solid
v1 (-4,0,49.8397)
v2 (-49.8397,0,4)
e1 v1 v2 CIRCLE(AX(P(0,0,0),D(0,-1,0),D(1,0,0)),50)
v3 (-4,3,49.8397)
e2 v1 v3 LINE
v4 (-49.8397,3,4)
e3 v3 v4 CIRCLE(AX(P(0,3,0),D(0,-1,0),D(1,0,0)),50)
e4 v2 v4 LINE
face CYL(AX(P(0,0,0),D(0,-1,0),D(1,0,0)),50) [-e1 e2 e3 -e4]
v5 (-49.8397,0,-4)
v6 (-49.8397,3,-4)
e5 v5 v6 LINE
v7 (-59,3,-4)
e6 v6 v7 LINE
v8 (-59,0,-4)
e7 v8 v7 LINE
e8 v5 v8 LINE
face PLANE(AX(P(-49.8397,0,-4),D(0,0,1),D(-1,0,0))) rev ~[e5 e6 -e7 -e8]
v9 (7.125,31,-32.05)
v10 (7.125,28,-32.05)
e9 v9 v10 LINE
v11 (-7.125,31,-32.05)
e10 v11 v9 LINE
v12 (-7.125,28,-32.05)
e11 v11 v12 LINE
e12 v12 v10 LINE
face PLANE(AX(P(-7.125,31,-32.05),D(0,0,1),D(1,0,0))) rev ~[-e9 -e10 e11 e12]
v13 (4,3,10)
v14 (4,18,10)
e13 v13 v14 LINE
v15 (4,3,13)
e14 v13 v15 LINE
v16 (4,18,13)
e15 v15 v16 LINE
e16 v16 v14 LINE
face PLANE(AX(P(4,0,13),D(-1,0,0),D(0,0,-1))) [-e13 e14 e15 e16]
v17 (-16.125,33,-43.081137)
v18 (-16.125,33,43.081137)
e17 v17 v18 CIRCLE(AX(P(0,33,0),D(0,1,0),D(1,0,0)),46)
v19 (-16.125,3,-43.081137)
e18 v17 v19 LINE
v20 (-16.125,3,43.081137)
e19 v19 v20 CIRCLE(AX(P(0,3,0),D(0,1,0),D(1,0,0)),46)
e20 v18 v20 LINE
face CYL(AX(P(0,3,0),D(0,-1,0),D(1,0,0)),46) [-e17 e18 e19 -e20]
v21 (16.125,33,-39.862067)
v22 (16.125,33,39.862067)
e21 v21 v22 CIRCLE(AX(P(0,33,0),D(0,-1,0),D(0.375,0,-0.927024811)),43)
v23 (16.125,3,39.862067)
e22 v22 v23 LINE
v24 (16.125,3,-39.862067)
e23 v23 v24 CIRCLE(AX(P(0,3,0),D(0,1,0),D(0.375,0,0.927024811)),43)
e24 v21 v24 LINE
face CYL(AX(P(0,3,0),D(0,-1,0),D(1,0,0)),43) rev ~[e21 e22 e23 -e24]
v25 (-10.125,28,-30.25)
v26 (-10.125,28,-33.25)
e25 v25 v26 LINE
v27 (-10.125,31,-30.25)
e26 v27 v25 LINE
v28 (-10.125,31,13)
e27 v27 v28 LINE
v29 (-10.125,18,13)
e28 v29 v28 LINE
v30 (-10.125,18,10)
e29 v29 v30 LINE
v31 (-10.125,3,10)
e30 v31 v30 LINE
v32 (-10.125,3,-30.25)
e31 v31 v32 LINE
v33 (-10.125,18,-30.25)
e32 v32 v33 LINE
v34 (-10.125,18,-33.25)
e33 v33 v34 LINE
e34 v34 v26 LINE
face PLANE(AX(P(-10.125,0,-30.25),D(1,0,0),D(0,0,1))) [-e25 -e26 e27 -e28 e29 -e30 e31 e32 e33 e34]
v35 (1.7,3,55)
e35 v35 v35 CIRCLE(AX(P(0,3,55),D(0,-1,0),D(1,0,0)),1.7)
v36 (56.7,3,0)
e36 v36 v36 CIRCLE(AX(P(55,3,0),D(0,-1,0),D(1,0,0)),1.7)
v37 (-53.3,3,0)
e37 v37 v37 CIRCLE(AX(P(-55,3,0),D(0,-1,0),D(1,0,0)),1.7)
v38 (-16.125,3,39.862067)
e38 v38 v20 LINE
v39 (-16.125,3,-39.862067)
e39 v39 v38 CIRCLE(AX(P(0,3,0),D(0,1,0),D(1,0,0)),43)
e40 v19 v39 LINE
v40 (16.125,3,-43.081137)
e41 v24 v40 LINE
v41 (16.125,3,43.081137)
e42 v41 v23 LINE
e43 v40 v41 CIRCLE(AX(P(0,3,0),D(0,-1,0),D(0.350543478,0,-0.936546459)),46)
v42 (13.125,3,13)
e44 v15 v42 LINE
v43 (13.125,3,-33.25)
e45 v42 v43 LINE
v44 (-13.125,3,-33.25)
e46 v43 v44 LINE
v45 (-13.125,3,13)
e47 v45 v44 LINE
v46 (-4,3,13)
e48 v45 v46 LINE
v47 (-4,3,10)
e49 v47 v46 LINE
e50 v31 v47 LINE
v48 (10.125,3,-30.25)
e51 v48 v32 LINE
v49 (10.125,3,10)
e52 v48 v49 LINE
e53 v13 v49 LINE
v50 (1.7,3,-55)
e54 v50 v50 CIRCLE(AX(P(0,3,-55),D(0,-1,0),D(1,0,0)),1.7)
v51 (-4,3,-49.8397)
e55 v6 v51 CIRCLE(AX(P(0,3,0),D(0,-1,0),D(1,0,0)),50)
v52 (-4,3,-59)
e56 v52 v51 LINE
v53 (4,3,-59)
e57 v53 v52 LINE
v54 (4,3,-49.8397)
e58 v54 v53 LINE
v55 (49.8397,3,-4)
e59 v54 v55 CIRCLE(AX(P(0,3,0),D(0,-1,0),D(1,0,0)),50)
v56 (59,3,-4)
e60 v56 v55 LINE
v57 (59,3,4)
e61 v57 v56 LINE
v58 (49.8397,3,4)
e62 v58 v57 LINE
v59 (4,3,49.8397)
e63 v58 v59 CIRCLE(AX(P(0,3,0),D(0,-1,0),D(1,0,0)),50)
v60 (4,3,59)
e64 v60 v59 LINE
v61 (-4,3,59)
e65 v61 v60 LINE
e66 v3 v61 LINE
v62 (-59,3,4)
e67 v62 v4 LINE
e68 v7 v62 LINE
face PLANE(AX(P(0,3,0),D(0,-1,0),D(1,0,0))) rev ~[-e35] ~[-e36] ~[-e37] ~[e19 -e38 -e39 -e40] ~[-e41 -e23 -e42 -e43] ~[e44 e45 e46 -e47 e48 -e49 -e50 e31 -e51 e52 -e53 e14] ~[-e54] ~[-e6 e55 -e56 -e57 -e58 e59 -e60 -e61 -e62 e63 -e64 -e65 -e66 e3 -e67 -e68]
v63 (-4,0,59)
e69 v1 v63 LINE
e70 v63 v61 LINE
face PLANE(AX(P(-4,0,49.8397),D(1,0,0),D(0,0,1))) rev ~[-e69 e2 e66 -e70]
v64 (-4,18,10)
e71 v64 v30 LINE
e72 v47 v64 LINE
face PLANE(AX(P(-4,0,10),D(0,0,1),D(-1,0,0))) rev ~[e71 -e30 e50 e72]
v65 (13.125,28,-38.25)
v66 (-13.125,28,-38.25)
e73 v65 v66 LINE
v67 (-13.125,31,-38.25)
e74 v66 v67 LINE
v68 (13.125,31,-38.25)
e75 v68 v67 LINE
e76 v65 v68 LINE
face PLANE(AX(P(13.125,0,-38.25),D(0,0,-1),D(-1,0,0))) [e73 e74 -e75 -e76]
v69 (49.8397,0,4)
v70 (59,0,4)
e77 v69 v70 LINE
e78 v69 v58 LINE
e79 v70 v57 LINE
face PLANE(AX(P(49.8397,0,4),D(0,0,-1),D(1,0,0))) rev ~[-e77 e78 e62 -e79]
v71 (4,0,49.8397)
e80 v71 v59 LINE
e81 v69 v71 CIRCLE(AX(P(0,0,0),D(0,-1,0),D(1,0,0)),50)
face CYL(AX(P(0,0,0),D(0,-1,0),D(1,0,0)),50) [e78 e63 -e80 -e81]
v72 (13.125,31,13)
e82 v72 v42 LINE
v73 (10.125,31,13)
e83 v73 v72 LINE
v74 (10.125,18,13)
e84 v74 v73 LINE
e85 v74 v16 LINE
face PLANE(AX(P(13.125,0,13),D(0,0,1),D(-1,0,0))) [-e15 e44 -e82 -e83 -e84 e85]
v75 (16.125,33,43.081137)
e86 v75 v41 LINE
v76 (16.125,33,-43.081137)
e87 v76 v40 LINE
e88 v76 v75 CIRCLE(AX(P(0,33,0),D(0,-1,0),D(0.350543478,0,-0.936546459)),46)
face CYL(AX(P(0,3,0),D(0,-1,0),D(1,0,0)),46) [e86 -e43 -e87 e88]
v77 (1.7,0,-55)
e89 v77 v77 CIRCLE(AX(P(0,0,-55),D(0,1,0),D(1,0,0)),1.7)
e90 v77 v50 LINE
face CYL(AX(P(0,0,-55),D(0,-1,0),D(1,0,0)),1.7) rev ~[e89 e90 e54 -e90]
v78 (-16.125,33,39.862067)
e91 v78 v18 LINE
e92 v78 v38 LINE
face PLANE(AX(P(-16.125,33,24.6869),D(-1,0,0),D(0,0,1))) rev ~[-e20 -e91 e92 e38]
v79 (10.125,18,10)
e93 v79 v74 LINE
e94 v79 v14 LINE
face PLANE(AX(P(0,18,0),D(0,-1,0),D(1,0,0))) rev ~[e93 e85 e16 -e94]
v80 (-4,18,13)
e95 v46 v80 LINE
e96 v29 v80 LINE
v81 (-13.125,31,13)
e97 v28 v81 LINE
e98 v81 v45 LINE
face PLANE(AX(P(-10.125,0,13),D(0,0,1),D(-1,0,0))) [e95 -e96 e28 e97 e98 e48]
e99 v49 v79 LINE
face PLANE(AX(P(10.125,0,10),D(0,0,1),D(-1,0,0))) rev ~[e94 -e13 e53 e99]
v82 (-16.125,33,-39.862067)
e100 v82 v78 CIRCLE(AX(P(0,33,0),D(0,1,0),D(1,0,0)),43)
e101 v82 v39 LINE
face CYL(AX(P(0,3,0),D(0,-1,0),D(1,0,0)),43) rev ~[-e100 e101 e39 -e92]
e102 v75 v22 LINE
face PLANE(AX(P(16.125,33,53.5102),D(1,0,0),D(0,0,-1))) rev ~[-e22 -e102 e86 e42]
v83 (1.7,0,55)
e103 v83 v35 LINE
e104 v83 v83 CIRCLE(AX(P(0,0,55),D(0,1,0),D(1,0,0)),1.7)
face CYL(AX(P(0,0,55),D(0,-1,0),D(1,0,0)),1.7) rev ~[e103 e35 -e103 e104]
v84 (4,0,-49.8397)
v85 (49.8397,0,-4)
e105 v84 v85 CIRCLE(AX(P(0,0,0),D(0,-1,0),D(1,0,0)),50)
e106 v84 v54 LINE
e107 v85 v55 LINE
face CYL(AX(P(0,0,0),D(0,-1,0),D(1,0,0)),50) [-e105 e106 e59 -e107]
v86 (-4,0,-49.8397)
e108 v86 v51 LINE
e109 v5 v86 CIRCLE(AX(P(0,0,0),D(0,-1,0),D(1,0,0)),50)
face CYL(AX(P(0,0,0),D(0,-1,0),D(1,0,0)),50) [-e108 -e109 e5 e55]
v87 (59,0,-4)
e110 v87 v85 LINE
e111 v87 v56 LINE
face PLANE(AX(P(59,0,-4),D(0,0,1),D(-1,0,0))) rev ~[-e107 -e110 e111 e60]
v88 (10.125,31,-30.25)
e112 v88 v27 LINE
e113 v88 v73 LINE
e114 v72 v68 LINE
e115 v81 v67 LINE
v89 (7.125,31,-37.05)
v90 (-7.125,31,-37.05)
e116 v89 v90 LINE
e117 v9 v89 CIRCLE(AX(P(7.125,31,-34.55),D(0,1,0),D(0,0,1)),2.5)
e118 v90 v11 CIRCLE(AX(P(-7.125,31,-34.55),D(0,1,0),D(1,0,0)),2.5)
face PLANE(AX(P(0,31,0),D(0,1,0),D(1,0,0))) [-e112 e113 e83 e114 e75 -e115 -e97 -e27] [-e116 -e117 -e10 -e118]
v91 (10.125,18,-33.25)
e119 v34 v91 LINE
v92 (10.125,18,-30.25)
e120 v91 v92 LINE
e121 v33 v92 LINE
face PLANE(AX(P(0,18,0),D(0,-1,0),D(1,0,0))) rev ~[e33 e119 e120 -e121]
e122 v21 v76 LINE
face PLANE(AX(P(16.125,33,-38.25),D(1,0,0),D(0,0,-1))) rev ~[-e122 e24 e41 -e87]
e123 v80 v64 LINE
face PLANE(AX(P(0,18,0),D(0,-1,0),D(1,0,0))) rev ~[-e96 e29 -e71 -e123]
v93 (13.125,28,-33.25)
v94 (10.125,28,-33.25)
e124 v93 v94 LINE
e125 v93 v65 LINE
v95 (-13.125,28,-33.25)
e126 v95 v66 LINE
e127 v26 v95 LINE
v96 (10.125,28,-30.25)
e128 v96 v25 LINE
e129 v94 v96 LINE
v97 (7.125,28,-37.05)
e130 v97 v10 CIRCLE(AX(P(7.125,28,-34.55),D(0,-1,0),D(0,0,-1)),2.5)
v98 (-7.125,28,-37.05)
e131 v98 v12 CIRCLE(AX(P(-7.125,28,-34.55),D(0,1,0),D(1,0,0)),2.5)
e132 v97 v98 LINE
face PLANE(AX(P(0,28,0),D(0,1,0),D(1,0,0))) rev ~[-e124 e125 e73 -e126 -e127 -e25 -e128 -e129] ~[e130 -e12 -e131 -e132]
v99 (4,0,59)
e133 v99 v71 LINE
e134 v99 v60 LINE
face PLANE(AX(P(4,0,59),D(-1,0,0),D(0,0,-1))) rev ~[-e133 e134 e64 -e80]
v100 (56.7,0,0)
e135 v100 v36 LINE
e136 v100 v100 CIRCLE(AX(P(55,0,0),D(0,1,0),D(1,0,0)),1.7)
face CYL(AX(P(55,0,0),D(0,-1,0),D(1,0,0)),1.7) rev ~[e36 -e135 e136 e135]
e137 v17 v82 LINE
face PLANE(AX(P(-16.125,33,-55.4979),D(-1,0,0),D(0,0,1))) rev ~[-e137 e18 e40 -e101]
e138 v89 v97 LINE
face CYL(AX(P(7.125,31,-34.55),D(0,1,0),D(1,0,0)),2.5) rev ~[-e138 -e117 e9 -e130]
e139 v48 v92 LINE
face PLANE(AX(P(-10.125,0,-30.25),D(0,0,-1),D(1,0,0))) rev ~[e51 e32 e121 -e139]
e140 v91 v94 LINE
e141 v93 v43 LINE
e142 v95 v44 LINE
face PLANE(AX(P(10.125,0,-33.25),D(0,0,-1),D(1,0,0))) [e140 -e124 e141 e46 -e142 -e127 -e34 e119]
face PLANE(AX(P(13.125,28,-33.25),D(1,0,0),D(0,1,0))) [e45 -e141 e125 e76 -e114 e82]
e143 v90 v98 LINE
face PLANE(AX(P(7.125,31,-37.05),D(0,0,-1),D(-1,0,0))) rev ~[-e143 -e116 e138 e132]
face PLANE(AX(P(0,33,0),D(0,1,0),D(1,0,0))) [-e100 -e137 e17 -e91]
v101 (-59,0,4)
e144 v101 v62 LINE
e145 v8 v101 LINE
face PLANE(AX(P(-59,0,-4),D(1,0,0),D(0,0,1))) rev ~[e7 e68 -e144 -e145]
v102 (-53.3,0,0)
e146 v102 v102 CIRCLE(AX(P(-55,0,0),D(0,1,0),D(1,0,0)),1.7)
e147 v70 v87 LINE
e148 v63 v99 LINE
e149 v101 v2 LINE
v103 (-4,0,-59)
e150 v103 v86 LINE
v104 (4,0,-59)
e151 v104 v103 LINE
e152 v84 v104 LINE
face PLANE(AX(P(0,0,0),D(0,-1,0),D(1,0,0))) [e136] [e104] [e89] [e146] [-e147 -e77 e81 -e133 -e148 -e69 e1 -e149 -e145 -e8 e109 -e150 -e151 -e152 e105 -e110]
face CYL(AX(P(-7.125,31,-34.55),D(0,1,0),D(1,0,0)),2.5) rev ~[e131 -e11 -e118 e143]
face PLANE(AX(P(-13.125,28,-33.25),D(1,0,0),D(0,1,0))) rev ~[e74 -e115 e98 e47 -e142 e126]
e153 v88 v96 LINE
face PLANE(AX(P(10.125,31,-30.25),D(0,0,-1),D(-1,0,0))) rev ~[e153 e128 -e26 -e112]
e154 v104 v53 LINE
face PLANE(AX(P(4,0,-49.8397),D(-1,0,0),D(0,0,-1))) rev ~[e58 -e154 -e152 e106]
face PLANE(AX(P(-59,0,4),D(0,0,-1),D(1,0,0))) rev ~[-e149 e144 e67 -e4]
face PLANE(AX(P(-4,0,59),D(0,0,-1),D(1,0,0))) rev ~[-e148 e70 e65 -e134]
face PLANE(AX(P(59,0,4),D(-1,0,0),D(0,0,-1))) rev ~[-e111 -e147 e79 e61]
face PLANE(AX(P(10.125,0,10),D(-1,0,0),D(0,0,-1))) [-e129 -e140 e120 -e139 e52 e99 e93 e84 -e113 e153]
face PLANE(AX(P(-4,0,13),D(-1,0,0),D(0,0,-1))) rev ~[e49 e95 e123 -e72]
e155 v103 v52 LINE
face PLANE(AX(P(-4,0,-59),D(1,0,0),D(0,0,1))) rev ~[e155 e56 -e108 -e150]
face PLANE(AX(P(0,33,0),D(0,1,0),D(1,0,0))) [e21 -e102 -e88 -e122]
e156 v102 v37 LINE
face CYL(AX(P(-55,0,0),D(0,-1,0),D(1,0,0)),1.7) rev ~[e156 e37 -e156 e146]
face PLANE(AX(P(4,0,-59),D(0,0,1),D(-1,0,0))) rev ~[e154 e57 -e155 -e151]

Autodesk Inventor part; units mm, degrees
ref_plane "YZ Plane" through (0, 0, 0) normal (1, 0, 0) x (0, 1, 0)
ref_plane "XZ Plane" through (0, 0, 0) normal (0, 1, 0) x (-1, 0, 0)
ref_plane "XY Plane" through (0, 0, 0) normal (0, 0, 1) x (1, 0, 0)
sketch "Sketch1" plane through (0, 0, 0) normal (0, 1, 0) x (-1, 0, 0)
  circle A0 centre (0, 0) radius 70.5
  circle A1 centre (0, 0) radius 75.5
  dimension "d0" = 141
  dimension "d4" = 5
extrude "Extrusion1" add sketch "Sketch1" along normal blind 50
sketch "Sketch2" plane through (0, 0, 0) normal (0, -1, 0) x (1, 0, 0)
  line L0 (-10.125, 10) -> (10.125, 10)
  line L1 (10.125, 10) -> (10.125, -30.25)
  line L2 (10.125, -30.25) -> (-10.125, -30.25)
  line L3 (-10.125, -30.25) -> (-10.125, 10)
  point P0 (0, 0)
  point P1 (0, 10)
  dimension "d5" = 20.25
  dimension "d6" = 40.25
  dimension "d7" = 10
  dimension "d8" = 10.125
  dimension "d9" = 10.125
extrude "Extrusion2" add sketch "Sketch2" against normal blind 3
sketch "Sketch3" plane through (0, 0, 0) normal (0, -1, 0) x (1, 0, 0)
  line L0 (13.125, 13) -> (10.125, 13)
  line L1 (10.125, 13) -> (10.125, -33.25)
  line L2 (10.125, -33.25) -> (13.125, -33.25)
  line L3 (13.125, -33.25) -> (13.125, 13)
  line L4 (10.125, -33.25) -> (-13.125, -33.25)
  line L5 (-13.125, -33.25) -> (-13.125, -30.25)
  line L6 (-13.125, -30.25) -> (10.125, -30.25)
  line L7 (10.125, -30.25) -> (10.125, -33.25)
  line L8 (-13.125, -30.25) -> (-10.125, -30.25)
  line L9 (-10.125, -30.25) -> (-10.125, 13)
  line L10 (-10.125, 13) -> (-13.125, 13)
  line L11 (-13.125, 13) -> (-13.125, -30.25)
  line L12 (-10.125, -30.25) -> (10.125, -30.25) projected
  line L13 (10.125, -30.25) -> (10.125, 10) projected
  line L14 (-10.125, 10) -> (-10.125, -30.25) projected
  line L15 (10.125, 10) -> (-10.125, 10) projected
  line L16 (10.125, 13) -> (4, 13)
  line L17 (4, 13) -> (4, 10)
  line L18 (4, 10) -> (10.125, 10)
  line L19 (10.125, 10) -> (10.125, 13)
  line L20 (-10.125, 13) -> (-4, 13)
  line L21 (-4, 13) -> (-4, 10)
  line L22 (-4, 10) -> (-10.125, 10)
  line L23 (-10.125, 10) -> (-10.125, 13)
  point P0 (0, 0)
  point P1 (-11.625, 13)
  point P2 (10.125, 11.5)
  dimension "d12" = 3
  dimension "d13" = 3
  dimension "d14" = 3
  dimension "d15" = 0
  dimension "d16" = 0
  dimension "d17" = 0
  dimension "d18" = 3
  dimension "d19" = 3
  dimension "d20" = 6.125
  dimension "d21" = 6.125
extrude "Extrusion3" add sketch "Sketch3" against normal blind 18 contours L3 L2 L1 L0 | L1 L15 L17 L16 | L4 L5 L6 L1 | L6 L11 L10 L9 | L15 L9 L20 L21
sketch "Sketch4" plane through (0, 18, 0) normal (0, 1, 0) x (1, 0, 0)
  line L0 (-4, -13) -> (-13.125, -13) projected
  line L1 (-13.125, 33.25) -> (13.125, 33.25) projected
  line L2 (-13.125, -13) -> (-10.125, -13)
  line L3 (-10.125, -13) -> (-10.125, 33.25)
  line L4 (-10.125, 33.25) -> (-13.125, 33.25)
  line L5 (-13.125, 33.25) -> (-13.125, -13)
  line L6 (13.125, -13) -> (13.125, 33.25) projected
  line L7 (13.125, 33.25) -> (10.125, 33.25)
  line L8 (10.125, 33.25) -> (10.125, -13)
  line L9 (10.125, -13) -> (13.125, -13)
  line L10 (13.125, -13) -> (13.125, 33.25)
  line L11 (-10.125, -10) -> (-10.125, 30.25) projected
  point P0 (0, 0)
  dimension "d24" = 0
extrude "Extrusion4" add sketch "Sketch4" along normal blind 13
sketch "Sketch5" plane through (13.125, 0, -33.25) normal (0, 0, -1) x (-1, 0, 0)
  line L0 (23.25, 31) -> (26.25, 31) projected
  line L1 (0, 0) -> (0, 31) projected
  line L2 (26.25, 31) -> (0, 31)
  line L3 (0, 31) -> (0, 28)
  line L4 (0, 28) -> (26.25, 28)
  line L5 (26.25, 28) -> (26.25, 31)
  point P0 (13.125, 0)
  dimension "d27" = 3
extrude "Extrusion5" add sketch "Sketch5" along normal blind 5
sketch "Sketch6" plane through (0, 31, 0) normal (0, 1, 0) x (1, 0, 0)
  line L0 (10.125, 33.25) -> (-10.125, 33.25) projected
  line L1 (-10.125, 33.25) -> (10.125, 33.25)
  line L2 (10.125, 33.25) -> (10.125, 30.25)
  line L3 (10.125, 30.25) -> (-10.125, 30.25)
  line L4 (-10.125, 30.25) -> (-10.125, 33.25)
  point P0 (0, 0)
extrude "Extrusion6" add sketch "Sketch6" against normal blind 3
sketch "Sketch7" plane through (0, 31, 0) normal (0, 1, 0) x (1, 0, 0)
  circle A0 centre (-7.125, 34.55) radius 2.5
  circle A1 centre (7.125, 34.55) radius 2.5
  line L0 (-10.125, 30.25) -> (10.125, 30.25) projected
  line L1 (-13.125, -13) -> (-13.125, 38.25) projected
  line L2 (13.125, -13) -> (13.125, 38.25) projected
  line L3 (-7.125, 32.05) -> (7.125, 32.05)
  line L4 (7.125, 37.05) -> (-7.125, 37.05)
  point P0 (0, 0)
  dimension "d32" = 4.3
  dimension "d33" = 0
  dimension "d34" = 5
  dimension "d35" = 5
  dimension "d36" = 6
  dimension "d37" = 6
extrude "Extrusion7" cut sketch "Sketch7" against normal blind 3
sketch "Sketch8" plane through (0, 0, 0) normal (0, -1, 0) x (1, 0, 0)
  line L0 (72.6444, -3) -> (-73.2822, -3)
  line L1 (-73.2822, -3) -> (-73.2822, 3)
  line L2 (-73.2822, 3) -> (72.6444, 3)
  line L3 (72.6444, 3) -> (72.6444, -3)
  line L4 (3, -73.2385) -> (-3, -73.2385)
  line L5 (-3, -73.2385) -> (-3, 72.5895)
  line L6 (-3, 72.5895) -> (3, 72.5895)
  line L7 (3, 72.5895) -> (3, -73.2385)
  point P0 (0, 0)
  point P1 (-0.3189, -3)
  point P2 (3, -3)
  point P3 (3, 3)
  point P4 (-3, 3)
  point P5 (-3, -3)
  dimension "d40" = 3
  dimension "d41" = 3
  dimension "d42" = 3
  dimension "d43" = 3
extrude "Extrusion8" add sketch "Sketch8" against normal blind 3
sketch "Sketch9" plane through (0, 50, 0) normal (0, 1, 0) x (1, 0, 0)
  arc A0 (-3, 70.4361) -> (-70.4361, 3) centre (0, 0) ccw projected
  line L0 (-15, 68.8858) -> (15, 68.8858)
  circle A1 centre (0, 0) radius 70.5 projected
  line L1 (-68.8858, -15) -> (-68.8858, 15)
  line L2 (15, -68.8858) -> (-15, -68.8858)
  line L3 (68.8858, 15) -> (68.8858, -15)
  dimension "d46" = 30
  dimension "d49" = 360
extrude "Extrusion9" add sketch "Sketch9" against normal blind 50 contours A1 L0 A0 | L1 A1 A0 | A1 L3 | L2 A1
sketch "Sketch10" plane through (-68.8858, 50, 15) normal (1, 0, 0) x (0, 0, -1)
  circle A0 centre (15, -12) radius 5
  line L0 (45.25, -47) -> (5, -47) projected
  line L1 (0, -50) -> (0, 0) projected
  point P0 (15, -50)
  dimension "d53" = 10
  dimension "d54" = 35
  dimension "d55" = 15
sketch "Sketch11" plane through (0, 3, 0) normal (0, 1, 0) x (1, 0, 0)
  point P0 (0, 0)
extrude "Extrusion10" add sketch "Sketch10" along normal blind 2
sketch "Sketch12" plane through (-66.8858, 38, 0) normal (1, 0, 0) x (0, 0, -1)
  circle A0 centre (0, 0) radius 3.97
  point P0 (0, -38)
  dimension "d58" = 7.94
extrude "Extrusion11" add sketch "Sketch12" along normal blind 11
sketch "Sketch13" plane through (-15, 50, -68.8858) normal (0, 0, 1) x (1, 0, 0)
  circle A0 centre (15, -12) radius 5
  line L0 (25.125, -47) -> (4.875, -47) projected
  point P0 (15, -50)
  dimension "d61" = 10
  dimension "d62" = 35
extrude "Extrusion12" add sketch "Sketch13" along normal blind 2
sketch "Sketch14" plane through (0, 38, -66.8858) normal (0, 0, 1) x (1, 0, 0)
  circle A0 centre (0, 0) radius 5 projected
  circle A1 centre (0, 0) radius 3.97
  point P0 (0, -38)
  dimension "d65" = 7.94
extrude "Extrusion13" add sketch "Sketch14" along normal blind 11 contours A1
sketch "Sketch15" plane through (68.8858, 50, -15) normal (-1, 0, 0) x (0, 0, 1)
  circle A0 centre (15, -12) radius 5
  line L0 (25, -47) -> (-15.25, -47) projected
  point P0 (15, -50)
  dimension "d68" = 10
  dimension "d69" = 35
extrude "Extrusion14" add sketch "Sketch15" along normal blind 2
sketch "Sketch16" plane through (66.8858, 38, 0) normal (-1, 0, 0) x (0, 0, 1)
  circle A0 centre (0, 0) radius 3.97
  point P0 (0, -38)
  dimension "d72" = 7.94
extrude "Extrusion15" add sketch "Sketch16" along normal blind 11
sketch "Sketch17" plane through (15, 50, 68.8858) normal (0, 0, -1) x (-1, 0, 0)
  circle A0 centre (15, -12) radius 5
  line L0 (12, -47) -> (11, -47) projected
  point P0 (15, -50)
  point P1 (11.5, -47)
  dimension "d75" = 10
  dimension "d76" = 35
extrude "Extrusion16" add sketch "Sketch17" along normal blind 2
sketch "Sketch18" plane through (0, 38, 66.8858) normal (0, 0, -1) x (-1, 0, 0)
  circle A0 centre (0, 0) radius 5 projected
  circle A1 centre (0, 0) radius 3.97
  point P0 (0, -38)
  dimension "d79" = 7.94
extrude "Extrusion17" add sketch "Sketch18" along normal blind 11 contours A1
sketch "Sketch19" plane through (0, 50, 0) normal (0, 1, 0) x (1, 0, 0)
  circle A0 centre (0, 0) radius 70.5
extrude "Extrusion18" cut sketch "Sketch19" against normal blind 8
sketch "Sketch20" plane through (0, 50, 0) normal (0, 1, 0) x (1, 0, 0)
  circle A0 centre (0, 0) radius 75.5
  circle A1 centre (0, 0) radius 70.5
extrude "Extrusion19" add sketch "Sketch20" along normal blind 10
sketch "Sketch21" plane through (15, 0, 68.8858) normal (0, 0, -1) x (-1, 0, 0)
  line L0 (18, 0) -> (18, 3) projected
  line L1 (18, 3) -> (13, 3)
  line L2 (13, 3) -> (13, 16.2196)
  line L3 (13, 16.2196) -> (18, 16.2196)
  line L4 (18, 16.2196) -> (18, 3)
  point P0 (15, 0)
  dimension "d87" = 5
  dimension "d88" = 13.2196
extrude "Extrusion20" cut sketch "Sketch21" against normal blind 10
sketch "Sketch22" plane through (0, 60, 0) normal (0, 1, 0) x (1, 0, 0)
  circle A0 centre (0, 0) radius 75.5 projected
  line L0 (-59.9939, -45.8364) -> (-80.9066, -64.8839)
  line L1 (-80.9066, -64.8839) -> (-67.4393, -79.67)
  line L2 (-67.4393, -79.67) -> (-45.8364, -59.9939)
  line L3 (-45.8364, -59.9939) -> (-59.9939, -45.8364)
  line L4 (-66.8858, -5) -> (-66.8858, 5) projected
  line L5 (64.8839, -80.9066) -> (79.67, -67.4393)
  line L6 (79.67, -67.4393) -> (59.9939, -45.8364)
  line L7 (45.8364, -59.9939) -> (64.8839, -80.9066)
  line L8 (59.9939, -45.8364) -> (45.8364, -59.9939)
  line L9 (80.9066, 64.8839) -> (67.4393, 79.67)
  line L10 (67.4393, 79.67) -> (45.8364, 59.9939)
  line L11 (59.9939, 45.8364) -> (80.9066, 64.8839)
  line L12 (45.8364, 59.9939) -> (59.9939, 45.8364)
  line L13 (-64.8839, 80.9066) -> (-79.67, 67.4393)
  line L14 (-79.67, 67.4393) -> (-59.9939, 45.8364)
  line L15 (-45.8364, 59.9939) -> (-64.8839, 80.9066)
  line L16 (-59.9939, 45.8364) -> (-45.8364, 59.9939)
  point P0 (-52.9152, -52.9152)
  point P1 (52.9152, -52.9152)
  point P2 (52.9152, 52.9152)
  point P3 (-52.9152, 52.9152)
  dimension "d91" = 45
  dimension "d92" = 20
  dimension "d93" = 52.9152
  dimension "d96" = 360
extrude "Extrusion21" add sketch "Sketch22" against normal blind 60 contours A0 L10 L9 L11 | L6 L5 L7 A0 | A0 L8 | A0 L14 L13 L15 | L2 L1 L0 A0
sketch "Sketch23" plane through (0, 60, 0) normal (0, 1, 0) x (1, 0, 0)
  arc A0 (-45.8364, -59.9939) -> (45.8364, -59.9939) centre (0, 0) ccw projected
  circle A1 centre (0, 0) radius 75.5
  line L0 (48.1887, -58.1214) -> (67.1018, -78.8865)
  line L1 (64.8839, -80.9066) -> (79.67, -67.4393) projected
  line L2 (78.1665, -70.2437) -> (58.101, -48.2133)
  line L3 (79.67, -67.4393) -> (59.9939, -45.8364) projected
  line L4 (45.8364, -59.9939) -> (64.8839, -80.9066) projected
  line L5 (67.1018, -78.8865) -> (61.0649, -93.7796)
  line L6 (61.0649, -93.7796) -> (42.6475, -67.861)
  line L7 (42.6475, -67.861) -> (45.8364, -59.9939)
  line L8 (67.1018, -78.8865) -> (77.4521, -69.4594)
  line L9 (58.1214, 48.1887) -> (78.8865, 67.1018)
  line L10 (70.2437, 78.1665) -> (48.2133, 58.101)
  line L11 (78.8865, 67.1018) -> (69.4594, 77.4521)
  circle A2 centre (0, 0) radius 75.5
  line L12 (-48.1887, 58.1214) -> (-67.1018, 78.8865)
  line L13 (-78.1665, 70.2437) -> (-58.101, 48.2133)
  line L14 (-67.1018, 78.8865) -> (-77.4521, 69.4594)
  circle A3 centre (0, 0) radius 75.5
  line L15 (-58.1214, -48.1887) -> (-78.8865, -67.1018)
  line L16 (-70.2437, -78.1665) -> (-48.2133, -58.101)
  line L17 (-78.8865, -67.1018) -> (-69.4594, -77.4521)
  circle A4 centre (0, 0) radius 75.5
  point P0 (45.8364, 59.9939)
  point P1 (-59.9939, 45.8364)
  point P2 (-45.8364, -59.9939)
  dimension "d100" = 3
  dimension "d101" = 3
  dimension "d102" = 151
  dimension "d105" = 360
extrude "Extrusion22" cut sketch "Sketch23" against normal blind 57 contours L16 L17 L15 A1 | A1 L2 L1 L0 | L13 L14 L12 A1 | L10 L11 L9 A1
sketch "Sketch24" plane through (59.9939, 0, -45.8364) normal (0.673368, 0, 0.7393075) x (0.7393075, 0, -0.673368)
  line L0 (0, 60) -> (-61.7295, 60) projected
  line L1 (28.2869, 0) -> (0, 0) projected
  line L2 (0, 60) -> (28.2869, 0)
  arc A0 (28.2869, 0) -> (0, 60) centre (28.2869, 36.6679) ccw
  point P0 (-75.2187, 0)
extrude "Extrusion23" cut sketch "Sketch24" against normal blind 57
sketch "Sketch25" plane through (-45.8364, 0, -59.9939) normal (0.7393075, 0, -0.673368) x (-0.673368, 0, -0.7393075)
  line L0 (0.2813, 60) -> (-0.4509, 60) projected
  line L1 (-0.9335, 0) -> (28.2869, 0) projected
  line L2 (-0.4509, 60) -> (28.2869, 0)
  arc A0 (28.2869, 0) -> (-0.4509, 60) centre (28.2869, 36.8822) ccw
  point P0 (-75.2187, 0)
  point P1 (0.1996, 60)
extrude "Extrusion24" cut sketch "Sketch25" against normal blind 57
sketch "Sketch26" plane through (-59.9939, 0, 45.8364) normal (-0.673368, 0, -0.7393075) x (-0.7393075, 0, 0.673368)
  line L0 (0, 0) -> (-61.7295, 0) projected
  line L1 (-0.9335, 0) -> (28.2869, 0) projected
  line L2 (0, 0) -> (28.2869, 0)
  arc A0 (28.2869, 0) -> (0, 67.3564) centre (28.2869, 39.6179) ccw
  line L3 (0, 67.3564) -> (0, 59.5281)
  line L4 (28.2869, 60) -> (28.2869, 0) projected
  line L5 (0, 59.5281) -> (28.2869, 0)
  point P0 (-75.2187, 0)
extrude "Extrusion25" cut sketch "Sketch26" against normal blind 57
sketch "Sketch27" plane through (45.8364, 0, 59.9939) normal (-0.7393075, 0, 0.673368) x (0.673368, 0, 0.7393075)
  line L0 (0, 0) -> (0, 60) projected
  line L1 (28.2869, 0) -> (0, 0) projected
  line L2 (0, 60) -> (28.2869, 0)
  arc A0 (28.2869, 0) -> (0, 60) centre (28.2869, 36.6679) ccw
  point P0 (-75.2187, 0)
extrude "Extrusion26" cut sketch "Sketch27" against normal blind 57 contours A0 L2
sketch "Sketch28" plane through (0, 3, 0) normal (0, 1, 0) x (1, 0, 0)
  circle A0 centre (67.6211, -69.0611) radius 2.5
  line L0 (66.1494, -77.8409) -> (76.4997, -68.4138) projected
  line L1 (76.4997, -68.4138) -> (58.4046, -48.5467) projected
  line L2 (48.1887, -58.1214) -> (66.1494, -77.8409) projected
  circle A1 centre (69.0611, 67.6211) radius 2.5
  circle A2 centre (-67.6211, 69.0611) radius 2.5
  circle A3 centre (-69.0611, -67.6211) radius 2.5
  point P0 (0, 0)
  dimension "d117" = 5
  dimension "d118" = 5.5
  dimension "d119" = 7
  dimension "d120" = 7
  dimension "d123" = 360
extrude "Extrusion27" cut sketch "Sketch28" against normal blind 57
sketch "Sketch29" plane through (0, 60, 0) normal (0, 1, 0) x (1, 0, 0)
  line L0 (-13.125, -13) -> (-13.125, -3) projected
  line L1 (13.125, -13) -> (13.125, 38.25) projected
  line L2 (-13.125, -13) -> (13.125, -13)
  line L3 (13.125, -13) -> (13.125, 38.25)
  line L4 (13.125, 38.25) -> (-13.125, 38.25)
  line L5 (-13.125, 38.25) -> (-13.125, -13)
  line L6 (-173.1074, 171.3287) -> (429.6424, 171.3287)
  line L7 (429.6424, 171.3287) -> (429.6424, -291.0697)
  line L8 (429.6424, -291.0697) -> (-173.1074, -291.0697)
  line L9 (-173.1074, -291.0697) -> (-173.1074, 171.3287)
  point P0 (0, 0)
  point P1 (-13.125, -3)
extrude "Extrusion28" cut sketch "Sketch29" against normal blind 1111
sketch "Sketch30" plane through (0, 3, 0) normal (0, 1, 0) x (1, 0, 0)
  line L0 (3, 33.25) -> (-3, 33.25) projected
  line L1 (-3, 38.25) -> (-3, 33.25) projected
  line L2 (3, 33.25) -> (-3, 33.25)
  line L3 (-3, 33.25) -> (-3, 38.25)
  line L4 (-3, 38.25) -> (3, 38.25)
  line L5 (3, 38.25) -> (3, 33.25)
  point P0 (0, 0)
extrude "Extrusion29" cut sketch "Sketch30" against normal blind 1111
sketch "Sketch31" plane through (0, 0, 0) normal (0, -1, 0) x (1, 0, 0)
  circle A0 centre (0, 0) radius 50
  dimension "d131" = 100
extrude "Extrusion30" add sketch "Sketch31" against normal blind 3
sketch "Sketch32" plane through (0, 3, 0) normal (0, 1, 0) x (1, 0, 0)
  circle A0 centre (0, 0) radius 46
  circle A1 centre (0, 0) radius 43
  dimension "d134" = 92
  dimension "d135" = 3
extrude "Extrusion31" add sketch "Sketch32" along normal blind 30
sketch "Sketch33" plane through (0, 33, 0) normal (0, 1, 0) x (1, 0, 0)
  line L0 (-16.125, 38.25) -> (16.125, 38.25)
  line L1 (16.125, 38.25) -> (16.125, 55.4979)
  line L2 (16.125, 55.4979) -> (-16.125, 55.4979)
  line L3 (-16.125, 55.4979) -> (-16.125, 38.25)
  line L4 (-13.125, -13) -> (-13.125, 38.25) projected
  line L5 (13.125, -13) -> (13.125, 38.25) projected
  line L6 (-16.125, -53.5102) -> (16.125, -53.5102)
  line L7 (16.125, -53.5102) -> (16.125, -24.6869)
  line L8 (16.125, -24.6869) -> (-16.125, -24.6869)
  line L9 (-16.125, -24.6869) -> (-16.125, -53.5102)
  point P0 (0, 0)
  dimension "d138" = 3
  dimension "d139" = 3
extrude "Extrusion32" cut sketch "Sketch33" against normal blind 30
sketch "Sketch34" plane through (0, 0, 0) normal (0, -1, 0) x (1, 0, 0)
  circle A0 centre (0, 0) radius 50
  line L0 (49.9711, 1.7) -> (55, 1.7)
  line L1 (55, 1.7) -> (55, -1.7)
  line L2 (55, -1.7) -> (49.9711, -1.7)
  circle A1 centre (55, 0) radius 1.7
  line L3 (49.8397, 4) -> (59, 4)
  line L4 (59, 4) -> (59, -4)
  line L5 (59, -4) -> (49.8397, -4)
  circle A2 centre (0, 0) radius 50
  line L6 (-1.7, 49.9711) -> (-1.7, 55)
  line L7 (-1.7, 55) -> (1.7, 55)
  line L8 (1.7, 55) -> (1.7, 49.9711)
  circle A3 centre (0, 55) radius 1.7
  line L9 (-4, 49.8397) -> (-4, 59)
  line L10 (-4, 59) -> (4, 59)
  line L11 (4, 59) -> (4, 49.8397)
  circle A4 centre (0, 0) radius 50
  line L12 (-49.9711, -1.7) -> (-55, -1.7)
  line L13 (-55, -1.7) -> (-55, 1.7)
  line L14 (-55, 1.7) -> (-49.9711, 1.7)
  circle A5 centre (-55, 0) radius 1.7
  line L15 (-49.8397, -4) -> (-59, -4)
  line L16 (-59, -4) -> (-59, 4)
  line L17 (-59, 4) -> (-49.8397, 4)
  circle A6 centre (0, 0) radius 50
  line L18 (1.7, -49.9711) -> (1.7, -55)
  line L19 (1.7, -55) -> (-1.7, -55)
  line L20 (-1.7, -55) -> (-1.7, -49.9711)
  circle A7 centre (0, -55) radius 1.7
  line L21 (4, -49.8397) -> (4, -59)
  line L22 (4, -59) -> (-4, -59)
  line L23 (-4, -59) -> (-4, -49.8397)
  dimension "d142" = 3.4
  dimension "d143" = 100
  dimension "d144" = 55
  dimension "d145" = 0
  dimension "d146" = 4
  dimension "d147" = 4
  dimension "d148" = 4
  dimension "d151" = 360
extrude "Extrusion33" add sketch "Sketch34" against normal blind 3 contours A0 L0 A1 L2 | A0 L3 L4 L5 L2 A1 L0 | A0 L8 A3 L6 L9 L10 L11 | L21 L22 L23 A0 L20 A7 L18 | A0 L6 A3 L8 | L18 A7 L20 A0 | A0 L14 A5 L12 L15 L16 L17 | A0 L12 A5 L14
properties part number "spinny base"
